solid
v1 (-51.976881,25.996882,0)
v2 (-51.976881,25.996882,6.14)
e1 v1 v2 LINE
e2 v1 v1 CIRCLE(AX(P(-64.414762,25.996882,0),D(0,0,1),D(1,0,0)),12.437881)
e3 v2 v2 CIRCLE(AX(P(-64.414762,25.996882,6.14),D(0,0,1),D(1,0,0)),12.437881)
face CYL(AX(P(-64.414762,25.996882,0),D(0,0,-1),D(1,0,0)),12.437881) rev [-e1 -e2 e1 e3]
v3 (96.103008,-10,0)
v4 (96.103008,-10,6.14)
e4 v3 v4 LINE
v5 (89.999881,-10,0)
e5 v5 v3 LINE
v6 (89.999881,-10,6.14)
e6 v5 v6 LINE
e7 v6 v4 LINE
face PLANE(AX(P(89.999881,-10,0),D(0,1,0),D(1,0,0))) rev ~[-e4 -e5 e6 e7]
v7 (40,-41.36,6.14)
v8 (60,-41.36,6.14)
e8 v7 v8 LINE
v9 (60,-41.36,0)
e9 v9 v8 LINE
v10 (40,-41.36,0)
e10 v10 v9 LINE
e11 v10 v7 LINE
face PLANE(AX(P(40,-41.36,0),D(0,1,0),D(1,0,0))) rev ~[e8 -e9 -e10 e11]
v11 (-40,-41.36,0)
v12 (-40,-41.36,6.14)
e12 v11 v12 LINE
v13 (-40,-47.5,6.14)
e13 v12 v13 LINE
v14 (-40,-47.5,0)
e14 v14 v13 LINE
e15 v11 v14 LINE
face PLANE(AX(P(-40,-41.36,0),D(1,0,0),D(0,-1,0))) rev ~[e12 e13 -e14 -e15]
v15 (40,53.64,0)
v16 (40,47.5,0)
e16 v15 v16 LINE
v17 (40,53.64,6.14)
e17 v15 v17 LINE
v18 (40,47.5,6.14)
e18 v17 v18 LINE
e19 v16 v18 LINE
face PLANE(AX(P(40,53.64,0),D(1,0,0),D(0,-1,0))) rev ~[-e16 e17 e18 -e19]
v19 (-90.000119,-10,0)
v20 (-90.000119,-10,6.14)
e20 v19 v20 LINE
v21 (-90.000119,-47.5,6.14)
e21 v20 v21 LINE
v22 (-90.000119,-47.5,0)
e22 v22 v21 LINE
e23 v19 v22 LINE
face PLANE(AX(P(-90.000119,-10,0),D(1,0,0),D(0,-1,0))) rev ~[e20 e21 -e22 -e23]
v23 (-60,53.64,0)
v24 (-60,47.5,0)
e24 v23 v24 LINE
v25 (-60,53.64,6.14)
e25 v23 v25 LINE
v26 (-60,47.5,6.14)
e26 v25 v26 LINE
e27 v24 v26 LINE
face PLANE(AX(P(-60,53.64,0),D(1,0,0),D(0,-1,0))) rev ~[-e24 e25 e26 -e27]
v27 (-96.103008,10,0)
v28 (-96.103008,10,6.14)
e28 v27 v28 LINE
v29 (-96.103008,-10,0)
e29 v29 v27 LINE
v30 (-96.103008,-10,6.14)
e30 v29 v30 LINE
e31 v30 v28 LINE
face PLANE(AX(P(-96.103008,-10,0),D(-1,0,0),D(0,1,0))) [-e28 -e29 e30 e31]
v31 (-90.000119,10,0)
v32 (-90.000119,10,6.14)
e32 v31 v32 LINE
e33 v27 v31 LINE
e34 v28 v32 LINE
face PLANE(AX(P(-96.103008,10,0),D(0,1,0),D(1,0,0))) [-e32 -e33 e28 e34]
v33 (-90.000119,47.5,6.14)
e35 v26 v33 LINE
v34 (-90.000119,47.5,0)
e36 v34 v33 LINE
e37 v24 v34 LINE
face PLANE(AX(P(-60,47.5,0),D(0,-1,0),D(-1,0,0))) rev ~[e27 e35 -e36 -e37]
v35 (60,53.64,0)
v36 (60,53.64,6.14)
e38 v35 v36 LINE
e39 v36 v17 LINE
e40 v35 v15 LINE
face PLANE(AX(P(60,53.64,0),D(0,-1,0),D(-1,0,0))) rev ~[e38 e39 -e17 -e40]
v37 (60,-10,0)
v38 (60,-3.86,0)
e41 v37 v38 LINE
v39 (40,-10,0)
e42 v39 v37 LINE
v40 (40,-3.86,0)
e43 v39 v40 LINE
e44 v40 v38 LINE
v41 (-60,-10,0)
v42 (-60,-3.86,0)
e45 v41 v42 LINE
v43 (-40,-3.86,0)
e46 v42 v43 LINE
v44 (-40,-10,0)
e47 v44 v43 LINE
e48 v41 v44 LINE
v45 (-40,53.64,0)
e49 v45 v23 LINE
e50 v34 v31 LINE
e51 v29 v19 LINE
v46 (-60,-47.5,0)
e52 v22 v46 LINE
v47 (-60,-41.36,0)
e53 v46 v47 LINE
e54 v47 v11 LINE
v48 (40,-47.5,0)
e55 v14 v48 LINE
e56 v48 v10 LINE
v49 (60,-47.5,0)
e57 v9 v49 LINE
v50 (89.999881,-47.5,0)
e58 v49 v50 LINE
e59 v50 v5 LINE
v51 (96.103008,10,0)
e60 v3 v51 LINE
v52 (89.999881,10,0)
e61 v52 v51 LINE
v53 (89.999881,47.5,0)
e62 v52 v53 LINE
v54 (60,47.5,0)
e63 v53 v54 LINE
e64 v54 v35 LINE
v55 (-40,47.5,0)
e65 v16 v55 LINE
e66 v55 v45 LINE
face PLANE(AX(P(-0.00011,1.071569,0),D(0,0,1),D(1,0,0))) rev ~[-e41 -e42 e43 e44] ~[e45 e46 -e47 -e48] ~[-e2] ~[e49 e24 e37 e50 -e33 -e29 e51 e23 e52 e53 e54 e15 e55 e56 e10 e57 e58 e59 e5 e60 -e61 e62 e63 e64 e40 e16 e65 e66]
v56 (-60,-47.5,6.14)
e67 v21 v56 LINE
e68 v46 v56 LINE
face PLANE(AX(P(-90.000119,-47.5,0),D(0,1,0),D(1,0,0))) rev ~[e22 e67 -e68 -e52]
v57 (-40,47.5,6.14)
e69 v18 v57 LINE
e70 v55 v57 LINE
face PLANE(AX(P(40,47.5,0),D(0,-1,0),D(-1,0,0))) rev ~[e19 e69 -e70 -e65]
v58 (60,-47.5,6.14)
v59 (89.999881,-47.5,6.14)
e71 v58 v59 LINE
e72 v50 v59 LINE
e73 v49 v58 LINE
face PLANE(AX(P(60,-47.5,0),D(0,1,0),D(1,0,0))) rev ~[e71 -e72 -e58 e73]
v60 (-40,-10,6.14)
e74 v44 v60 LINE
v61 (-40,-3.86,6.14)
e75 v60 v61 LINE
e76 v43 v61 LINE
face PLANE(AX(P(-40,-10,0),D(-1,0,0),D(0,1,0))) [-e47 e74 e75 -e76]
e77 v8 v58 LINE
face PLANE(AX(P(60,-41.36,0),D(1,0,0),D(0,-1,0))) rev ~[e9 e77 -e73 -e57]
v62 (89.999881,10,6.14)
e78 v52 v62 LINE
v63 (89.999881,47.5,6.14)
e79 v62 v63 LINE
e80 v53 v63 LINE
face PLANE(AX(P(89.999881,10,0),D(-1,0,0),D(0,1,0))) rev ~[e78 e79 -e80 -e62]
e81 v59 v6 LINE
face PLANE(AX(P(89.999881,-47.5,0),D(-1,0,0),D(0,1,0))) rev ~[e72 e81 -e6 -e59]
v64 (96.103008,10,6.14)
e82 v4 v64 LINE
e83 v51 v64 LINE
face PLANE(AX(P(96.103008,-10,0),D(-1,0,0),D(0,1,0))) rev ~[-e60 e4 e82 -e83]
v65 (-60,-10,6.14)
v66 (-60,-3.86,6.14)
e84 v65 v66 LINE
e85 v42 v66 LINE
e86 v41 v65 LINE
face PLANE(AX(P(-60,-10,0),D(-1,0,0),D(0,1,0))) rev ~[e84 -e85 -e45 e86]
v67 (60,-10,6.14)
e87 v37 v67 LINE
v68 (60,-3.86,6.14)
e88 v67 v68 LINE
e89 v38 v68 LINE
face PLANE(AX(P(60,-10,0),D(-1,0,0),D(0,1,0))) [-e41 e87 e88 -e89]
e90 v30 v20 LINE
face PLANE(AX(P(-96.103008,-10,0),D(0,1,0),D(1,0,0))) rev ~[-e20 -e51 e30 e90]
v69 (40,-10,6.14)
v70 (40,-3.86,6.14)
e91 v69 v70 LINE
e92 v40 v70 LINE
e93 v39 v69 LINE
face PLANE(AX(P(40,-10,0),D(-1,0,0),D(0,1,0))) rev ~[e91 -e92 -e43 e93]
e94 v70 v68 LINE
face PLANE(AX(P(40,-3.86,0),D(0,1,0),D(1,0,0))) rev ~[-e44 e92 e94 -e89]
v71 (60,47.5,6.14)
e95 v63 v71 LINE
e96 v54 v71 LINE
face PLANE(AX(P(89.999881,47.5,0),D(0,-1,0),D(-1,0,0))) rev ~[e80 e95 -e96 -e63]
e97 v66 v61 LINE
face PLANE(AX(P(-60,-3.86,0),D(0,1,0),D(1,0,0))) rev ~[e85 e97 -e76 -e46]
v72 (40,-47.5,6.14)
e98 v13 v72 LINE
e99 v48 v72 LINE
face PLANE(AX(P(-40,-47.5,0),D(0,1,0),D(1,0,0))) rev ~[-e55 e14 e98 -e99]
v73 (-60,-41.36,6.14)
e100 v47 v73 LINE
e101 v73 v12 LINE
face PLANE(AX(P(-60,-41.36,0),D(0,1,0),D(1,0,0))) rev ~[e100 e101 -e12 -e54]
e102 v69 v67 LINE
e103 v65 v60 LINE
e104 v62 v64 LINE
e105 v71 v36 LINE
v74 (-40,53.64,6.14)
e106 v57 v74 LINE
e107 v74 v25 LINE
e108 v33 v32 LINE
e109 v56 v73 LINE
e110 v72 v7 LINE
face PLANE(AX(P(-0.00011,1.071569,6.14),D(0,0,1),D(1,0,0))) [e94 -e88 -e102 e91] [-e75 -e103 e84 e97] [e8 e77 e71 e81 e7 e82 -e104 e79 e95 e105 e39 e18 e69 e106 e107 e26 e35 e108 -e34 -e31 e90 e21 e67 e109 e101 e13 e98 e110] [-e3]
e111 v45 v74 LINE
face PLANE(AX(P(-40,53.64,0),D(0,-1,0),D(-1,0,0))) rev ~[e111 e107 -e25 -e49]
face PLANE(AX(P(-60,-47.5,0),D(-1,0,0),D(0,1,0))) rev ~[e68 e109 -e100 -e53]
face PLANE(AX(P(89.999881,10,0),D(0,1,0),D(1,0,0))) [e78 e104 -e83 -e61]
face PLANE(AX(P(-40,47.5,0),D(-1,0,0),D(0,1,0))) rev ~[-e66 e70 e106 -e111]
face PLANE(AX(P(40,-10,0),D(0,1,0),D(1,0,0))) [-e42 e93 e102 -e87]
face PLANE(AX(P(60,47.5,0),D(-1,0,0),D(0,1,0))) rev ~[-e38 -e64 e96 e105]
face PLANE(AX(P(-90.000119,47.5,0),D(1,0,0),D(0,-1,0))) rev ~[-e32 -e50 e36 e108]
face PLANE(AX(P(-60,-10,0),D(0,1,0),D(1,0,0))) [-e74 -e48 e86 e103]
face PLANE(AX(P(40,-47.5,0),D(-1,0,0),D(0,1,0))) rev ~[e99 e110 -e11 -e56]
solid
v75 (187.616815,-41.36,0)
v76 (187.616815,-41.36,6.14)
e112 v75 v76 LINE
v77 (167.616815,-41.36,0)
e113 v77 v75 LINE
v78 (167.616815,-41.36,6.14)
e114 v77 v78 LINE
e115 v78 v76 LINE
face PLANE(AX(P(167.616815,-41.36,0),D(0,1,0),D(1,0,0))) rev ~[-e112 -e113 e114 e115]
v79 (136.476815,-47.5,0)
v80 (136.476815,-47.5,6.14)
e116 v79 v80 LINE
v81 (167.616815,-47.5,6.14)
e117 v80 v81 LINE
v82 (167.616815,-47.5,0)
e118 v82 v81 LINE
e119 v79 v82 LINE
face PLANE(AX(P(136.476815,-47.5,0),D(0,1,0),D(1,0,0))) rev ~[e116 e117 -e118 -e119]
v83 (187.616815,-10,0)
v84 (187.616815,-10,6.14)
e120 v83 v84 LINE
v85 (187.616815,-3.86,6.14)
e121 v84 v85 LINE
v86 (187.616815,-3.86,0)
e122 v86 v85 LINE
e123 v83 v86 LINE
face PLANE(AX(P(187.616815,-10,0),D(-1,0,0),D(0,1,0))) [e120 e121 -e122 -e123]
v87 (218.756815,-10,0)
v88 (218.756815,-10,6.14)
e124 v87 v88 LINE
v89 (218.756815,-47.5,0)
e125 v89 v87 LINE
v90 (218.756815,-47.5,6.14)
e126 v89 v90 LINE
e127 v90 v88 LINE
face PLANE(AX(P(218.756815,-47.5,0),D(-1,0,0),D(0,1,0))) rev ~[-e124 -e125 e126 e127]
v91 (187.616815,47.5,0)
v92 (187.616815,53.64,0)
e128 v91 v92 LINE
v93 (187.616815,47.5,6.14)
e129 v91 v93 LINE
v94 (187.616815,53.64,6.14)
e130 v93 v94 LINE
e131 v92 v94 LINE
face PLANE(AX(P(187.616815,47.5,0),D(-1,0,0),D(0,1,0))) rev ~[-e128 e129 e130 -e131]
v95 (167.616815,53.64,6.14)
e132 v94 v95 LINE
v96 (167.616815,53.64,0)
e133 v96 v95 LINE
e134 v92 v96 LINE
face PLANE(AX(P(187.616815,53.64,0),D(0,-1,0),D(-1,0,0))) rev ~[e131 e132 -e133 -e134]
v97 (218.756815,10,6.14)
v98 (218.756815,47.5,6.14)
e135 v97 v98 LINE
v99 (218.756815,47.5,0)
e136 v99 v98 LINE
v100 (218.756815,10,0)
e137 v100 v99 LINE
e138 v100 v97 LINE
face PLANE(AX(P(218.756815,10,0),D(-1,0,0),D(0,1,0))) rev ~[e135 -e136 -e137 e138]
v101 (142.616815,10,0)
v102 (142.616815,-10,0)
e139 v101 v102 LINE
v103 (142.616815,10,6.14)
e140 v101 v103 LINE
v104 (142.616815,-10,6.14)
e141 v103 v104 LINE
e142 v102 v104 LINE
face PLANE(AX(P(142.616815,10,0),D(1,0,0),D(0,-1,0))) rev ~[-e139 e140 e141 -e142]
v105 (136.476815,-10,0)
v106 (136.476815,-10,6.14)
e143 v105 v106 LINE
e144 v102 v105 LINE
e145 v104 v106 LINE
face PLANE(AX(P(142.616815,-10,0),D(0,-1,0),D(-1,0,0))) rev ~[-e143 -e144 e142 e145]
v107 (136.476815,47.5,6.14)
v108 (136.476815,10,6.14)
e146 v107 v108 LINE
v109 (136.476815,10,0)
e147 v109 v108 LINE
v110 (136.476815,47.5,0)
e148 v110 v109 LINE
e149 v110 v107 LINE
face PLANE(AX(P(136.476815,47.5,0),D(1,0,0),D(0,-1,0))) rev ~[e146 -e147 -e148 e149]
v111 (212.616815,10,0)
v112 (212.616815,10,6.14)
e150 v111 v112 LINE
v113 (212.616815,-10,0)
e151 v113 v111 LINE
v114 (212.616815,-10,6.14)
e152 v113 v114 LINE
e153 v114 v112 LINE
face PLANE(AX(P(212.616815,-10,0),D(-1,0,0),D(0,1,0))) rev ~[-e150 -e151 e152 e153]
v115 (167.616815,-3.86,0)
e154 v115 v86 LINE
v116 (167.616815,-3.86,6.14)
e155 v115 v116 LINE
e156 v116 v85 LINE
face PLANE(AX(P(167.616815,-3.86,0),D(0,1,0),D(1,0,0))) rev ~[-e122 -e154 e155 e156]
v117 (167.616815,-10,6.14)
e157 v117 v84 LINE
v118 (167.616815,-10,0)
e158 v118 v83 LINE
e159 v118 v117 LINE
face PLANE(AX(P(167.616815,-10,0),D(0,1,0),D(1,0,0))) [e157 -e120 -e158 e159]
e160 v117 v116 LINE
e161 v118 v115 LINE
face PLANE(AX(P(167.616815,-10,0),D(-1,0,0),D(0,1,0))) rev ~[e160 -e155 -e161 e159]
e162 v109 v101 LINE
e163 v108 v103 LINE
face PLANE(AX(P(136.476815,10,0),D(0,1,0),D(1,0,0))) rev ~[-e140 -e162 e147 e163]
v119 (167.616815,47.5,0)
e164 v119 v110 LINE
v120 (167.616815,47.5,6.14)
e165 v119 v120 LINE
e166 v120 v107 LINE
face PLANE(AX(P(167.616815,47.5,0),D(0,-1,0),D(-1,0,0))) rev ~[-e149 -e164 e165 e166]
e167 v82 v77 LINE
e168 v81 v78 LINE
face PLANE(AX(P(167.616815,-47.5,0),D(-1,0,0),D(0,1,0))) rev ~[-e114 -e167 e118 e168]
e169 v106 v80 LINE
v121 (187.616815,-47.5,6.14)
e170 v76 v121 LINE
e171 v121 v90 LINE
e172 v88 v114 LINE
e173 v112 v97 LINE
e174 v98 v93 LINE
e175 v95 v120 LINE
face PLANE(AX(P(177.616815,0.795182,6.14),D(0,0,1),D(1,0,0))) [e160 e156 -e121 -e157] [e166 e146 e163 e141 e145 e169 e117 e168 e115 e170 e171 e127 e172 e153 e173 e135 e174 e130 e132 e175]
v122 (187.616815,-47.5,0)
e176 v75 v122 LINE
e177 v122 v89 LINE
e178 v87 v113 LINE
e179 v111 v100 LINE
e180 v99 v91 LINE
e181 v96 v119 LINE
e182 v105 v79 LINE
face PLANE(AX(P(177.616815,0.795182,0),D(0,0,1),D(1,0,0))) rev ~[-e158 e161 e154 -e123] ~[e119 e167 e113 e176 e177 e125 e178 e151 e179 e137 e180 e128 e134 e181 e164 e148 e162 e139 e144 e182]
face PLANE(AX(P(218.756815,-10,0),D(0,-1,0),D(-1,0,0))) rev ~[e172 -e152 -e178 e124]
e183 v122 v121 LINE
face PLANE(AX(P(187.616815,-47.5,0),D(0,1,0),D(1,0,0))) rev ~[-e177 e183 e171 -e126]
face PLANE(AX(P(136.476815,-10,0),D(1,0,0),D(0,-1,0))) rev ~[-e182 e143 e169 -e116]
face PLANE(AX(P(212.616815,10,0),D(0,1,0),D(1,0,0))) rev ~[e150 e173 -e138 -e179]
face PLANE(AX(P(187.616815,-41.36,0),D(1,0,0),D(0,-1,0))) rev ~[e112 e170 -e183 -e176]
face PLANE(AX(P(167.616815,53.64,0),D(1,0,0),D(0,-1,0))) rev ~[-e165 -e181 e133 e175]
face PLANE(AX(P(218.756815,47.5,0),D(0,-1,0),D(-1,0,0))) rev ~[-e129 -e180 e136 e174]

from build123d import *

# Parameters (mm, degrees)
F1_W     = 20
F1_H     = 6.14
F1_R     = 12.4378806179
F1_W_2   = 6.103127097
F1_H_2   = 20
F1_W_3   = 6.102888166
F2_DEPTH = 6.14
F3_DEPTH = 6.14


# Not quite as in the source:
# - a feature names something its author has since deleted; it is built from what else it names


with BuildPart() as f2:
    # F1 (on Top) → F2 (new body)
    with BuildSketch(Plane.XY):
        Polygon((-90.0001194655, -10), (-90.0001194655, -47.5), (-60, -47.5), (-60, -41.36), (-40, -41.36), (-40, -47.5), (40, -47.5), (40, -41.36), (60, -41.36), (60, -47.5), (89.9998805345, -47.5), (89.9998805345, -10), (89.9998805345, 10), (89.9998805345, 47.5), (60, 47.5), (60, 53.64), (40, 53.64), (40, 47.5), (-40, 47.5), (-40, 53.64), (-60, 53.64), (-60, 47.5), (-90.0001194655, 47.5), (-90.0001194655, 10), align=None)
        with Locations((-50, -6.93)):
            Rectangle(F1_W, F1_H, mode=Mode.SUBTRACT)
        with Locations((50, -6.93)):
            Rectangle(F1_W, F1_H, mode=Mode.SUBTRACT)
        with Locations((-64.4147619605, 25.9968824685)):
            Circle(F1_R, mode=Mode.SUBTRACT)
        with Locations((93.051444083, 0)):
            Rectangle(F1_W_2, F1_H_2)
        with Locations((-93.0515635485, 0)):
            Rectangle(F1_W_3, F1_H_2)
    extrude(amount=F2_DEPTH)


with BuildPart() as f3:
    # F1 (on Top) → F3 (new body)
    with BuildSketch(Plane.XY):
        Polygon((218.7568147469, -10), (212.6168147469, -10), (212.6168147469, 10), (218.7568147469, 10), (218.7568147469, 47.5), (187.6168147469, 47.5), (187.6168147469, 53.64), (167.6168147469, 53.64), (167.6168147469, 47.5), (136.4768147469, 47.5), (136.4768147469, 10), (142.6168147469, 10), (142.6168147469, -10), (136.4768147469, -10), (136.4768147469, -47.5), (167.6168147469, -47.5), (167.6168147469, -41.36), (187.6168147469, -41.36), (187.6168147469, -47.5), (218.7568147469, -47.5), align=None)
        with Locations((177.6168147469, -6.93)):
            Rectangle(F1_W, F1_H, mode=Mode.SUBTRACT)
    extrude(amount=F3_DEPTH)


solid = Compound([f2.part, f3.part])
